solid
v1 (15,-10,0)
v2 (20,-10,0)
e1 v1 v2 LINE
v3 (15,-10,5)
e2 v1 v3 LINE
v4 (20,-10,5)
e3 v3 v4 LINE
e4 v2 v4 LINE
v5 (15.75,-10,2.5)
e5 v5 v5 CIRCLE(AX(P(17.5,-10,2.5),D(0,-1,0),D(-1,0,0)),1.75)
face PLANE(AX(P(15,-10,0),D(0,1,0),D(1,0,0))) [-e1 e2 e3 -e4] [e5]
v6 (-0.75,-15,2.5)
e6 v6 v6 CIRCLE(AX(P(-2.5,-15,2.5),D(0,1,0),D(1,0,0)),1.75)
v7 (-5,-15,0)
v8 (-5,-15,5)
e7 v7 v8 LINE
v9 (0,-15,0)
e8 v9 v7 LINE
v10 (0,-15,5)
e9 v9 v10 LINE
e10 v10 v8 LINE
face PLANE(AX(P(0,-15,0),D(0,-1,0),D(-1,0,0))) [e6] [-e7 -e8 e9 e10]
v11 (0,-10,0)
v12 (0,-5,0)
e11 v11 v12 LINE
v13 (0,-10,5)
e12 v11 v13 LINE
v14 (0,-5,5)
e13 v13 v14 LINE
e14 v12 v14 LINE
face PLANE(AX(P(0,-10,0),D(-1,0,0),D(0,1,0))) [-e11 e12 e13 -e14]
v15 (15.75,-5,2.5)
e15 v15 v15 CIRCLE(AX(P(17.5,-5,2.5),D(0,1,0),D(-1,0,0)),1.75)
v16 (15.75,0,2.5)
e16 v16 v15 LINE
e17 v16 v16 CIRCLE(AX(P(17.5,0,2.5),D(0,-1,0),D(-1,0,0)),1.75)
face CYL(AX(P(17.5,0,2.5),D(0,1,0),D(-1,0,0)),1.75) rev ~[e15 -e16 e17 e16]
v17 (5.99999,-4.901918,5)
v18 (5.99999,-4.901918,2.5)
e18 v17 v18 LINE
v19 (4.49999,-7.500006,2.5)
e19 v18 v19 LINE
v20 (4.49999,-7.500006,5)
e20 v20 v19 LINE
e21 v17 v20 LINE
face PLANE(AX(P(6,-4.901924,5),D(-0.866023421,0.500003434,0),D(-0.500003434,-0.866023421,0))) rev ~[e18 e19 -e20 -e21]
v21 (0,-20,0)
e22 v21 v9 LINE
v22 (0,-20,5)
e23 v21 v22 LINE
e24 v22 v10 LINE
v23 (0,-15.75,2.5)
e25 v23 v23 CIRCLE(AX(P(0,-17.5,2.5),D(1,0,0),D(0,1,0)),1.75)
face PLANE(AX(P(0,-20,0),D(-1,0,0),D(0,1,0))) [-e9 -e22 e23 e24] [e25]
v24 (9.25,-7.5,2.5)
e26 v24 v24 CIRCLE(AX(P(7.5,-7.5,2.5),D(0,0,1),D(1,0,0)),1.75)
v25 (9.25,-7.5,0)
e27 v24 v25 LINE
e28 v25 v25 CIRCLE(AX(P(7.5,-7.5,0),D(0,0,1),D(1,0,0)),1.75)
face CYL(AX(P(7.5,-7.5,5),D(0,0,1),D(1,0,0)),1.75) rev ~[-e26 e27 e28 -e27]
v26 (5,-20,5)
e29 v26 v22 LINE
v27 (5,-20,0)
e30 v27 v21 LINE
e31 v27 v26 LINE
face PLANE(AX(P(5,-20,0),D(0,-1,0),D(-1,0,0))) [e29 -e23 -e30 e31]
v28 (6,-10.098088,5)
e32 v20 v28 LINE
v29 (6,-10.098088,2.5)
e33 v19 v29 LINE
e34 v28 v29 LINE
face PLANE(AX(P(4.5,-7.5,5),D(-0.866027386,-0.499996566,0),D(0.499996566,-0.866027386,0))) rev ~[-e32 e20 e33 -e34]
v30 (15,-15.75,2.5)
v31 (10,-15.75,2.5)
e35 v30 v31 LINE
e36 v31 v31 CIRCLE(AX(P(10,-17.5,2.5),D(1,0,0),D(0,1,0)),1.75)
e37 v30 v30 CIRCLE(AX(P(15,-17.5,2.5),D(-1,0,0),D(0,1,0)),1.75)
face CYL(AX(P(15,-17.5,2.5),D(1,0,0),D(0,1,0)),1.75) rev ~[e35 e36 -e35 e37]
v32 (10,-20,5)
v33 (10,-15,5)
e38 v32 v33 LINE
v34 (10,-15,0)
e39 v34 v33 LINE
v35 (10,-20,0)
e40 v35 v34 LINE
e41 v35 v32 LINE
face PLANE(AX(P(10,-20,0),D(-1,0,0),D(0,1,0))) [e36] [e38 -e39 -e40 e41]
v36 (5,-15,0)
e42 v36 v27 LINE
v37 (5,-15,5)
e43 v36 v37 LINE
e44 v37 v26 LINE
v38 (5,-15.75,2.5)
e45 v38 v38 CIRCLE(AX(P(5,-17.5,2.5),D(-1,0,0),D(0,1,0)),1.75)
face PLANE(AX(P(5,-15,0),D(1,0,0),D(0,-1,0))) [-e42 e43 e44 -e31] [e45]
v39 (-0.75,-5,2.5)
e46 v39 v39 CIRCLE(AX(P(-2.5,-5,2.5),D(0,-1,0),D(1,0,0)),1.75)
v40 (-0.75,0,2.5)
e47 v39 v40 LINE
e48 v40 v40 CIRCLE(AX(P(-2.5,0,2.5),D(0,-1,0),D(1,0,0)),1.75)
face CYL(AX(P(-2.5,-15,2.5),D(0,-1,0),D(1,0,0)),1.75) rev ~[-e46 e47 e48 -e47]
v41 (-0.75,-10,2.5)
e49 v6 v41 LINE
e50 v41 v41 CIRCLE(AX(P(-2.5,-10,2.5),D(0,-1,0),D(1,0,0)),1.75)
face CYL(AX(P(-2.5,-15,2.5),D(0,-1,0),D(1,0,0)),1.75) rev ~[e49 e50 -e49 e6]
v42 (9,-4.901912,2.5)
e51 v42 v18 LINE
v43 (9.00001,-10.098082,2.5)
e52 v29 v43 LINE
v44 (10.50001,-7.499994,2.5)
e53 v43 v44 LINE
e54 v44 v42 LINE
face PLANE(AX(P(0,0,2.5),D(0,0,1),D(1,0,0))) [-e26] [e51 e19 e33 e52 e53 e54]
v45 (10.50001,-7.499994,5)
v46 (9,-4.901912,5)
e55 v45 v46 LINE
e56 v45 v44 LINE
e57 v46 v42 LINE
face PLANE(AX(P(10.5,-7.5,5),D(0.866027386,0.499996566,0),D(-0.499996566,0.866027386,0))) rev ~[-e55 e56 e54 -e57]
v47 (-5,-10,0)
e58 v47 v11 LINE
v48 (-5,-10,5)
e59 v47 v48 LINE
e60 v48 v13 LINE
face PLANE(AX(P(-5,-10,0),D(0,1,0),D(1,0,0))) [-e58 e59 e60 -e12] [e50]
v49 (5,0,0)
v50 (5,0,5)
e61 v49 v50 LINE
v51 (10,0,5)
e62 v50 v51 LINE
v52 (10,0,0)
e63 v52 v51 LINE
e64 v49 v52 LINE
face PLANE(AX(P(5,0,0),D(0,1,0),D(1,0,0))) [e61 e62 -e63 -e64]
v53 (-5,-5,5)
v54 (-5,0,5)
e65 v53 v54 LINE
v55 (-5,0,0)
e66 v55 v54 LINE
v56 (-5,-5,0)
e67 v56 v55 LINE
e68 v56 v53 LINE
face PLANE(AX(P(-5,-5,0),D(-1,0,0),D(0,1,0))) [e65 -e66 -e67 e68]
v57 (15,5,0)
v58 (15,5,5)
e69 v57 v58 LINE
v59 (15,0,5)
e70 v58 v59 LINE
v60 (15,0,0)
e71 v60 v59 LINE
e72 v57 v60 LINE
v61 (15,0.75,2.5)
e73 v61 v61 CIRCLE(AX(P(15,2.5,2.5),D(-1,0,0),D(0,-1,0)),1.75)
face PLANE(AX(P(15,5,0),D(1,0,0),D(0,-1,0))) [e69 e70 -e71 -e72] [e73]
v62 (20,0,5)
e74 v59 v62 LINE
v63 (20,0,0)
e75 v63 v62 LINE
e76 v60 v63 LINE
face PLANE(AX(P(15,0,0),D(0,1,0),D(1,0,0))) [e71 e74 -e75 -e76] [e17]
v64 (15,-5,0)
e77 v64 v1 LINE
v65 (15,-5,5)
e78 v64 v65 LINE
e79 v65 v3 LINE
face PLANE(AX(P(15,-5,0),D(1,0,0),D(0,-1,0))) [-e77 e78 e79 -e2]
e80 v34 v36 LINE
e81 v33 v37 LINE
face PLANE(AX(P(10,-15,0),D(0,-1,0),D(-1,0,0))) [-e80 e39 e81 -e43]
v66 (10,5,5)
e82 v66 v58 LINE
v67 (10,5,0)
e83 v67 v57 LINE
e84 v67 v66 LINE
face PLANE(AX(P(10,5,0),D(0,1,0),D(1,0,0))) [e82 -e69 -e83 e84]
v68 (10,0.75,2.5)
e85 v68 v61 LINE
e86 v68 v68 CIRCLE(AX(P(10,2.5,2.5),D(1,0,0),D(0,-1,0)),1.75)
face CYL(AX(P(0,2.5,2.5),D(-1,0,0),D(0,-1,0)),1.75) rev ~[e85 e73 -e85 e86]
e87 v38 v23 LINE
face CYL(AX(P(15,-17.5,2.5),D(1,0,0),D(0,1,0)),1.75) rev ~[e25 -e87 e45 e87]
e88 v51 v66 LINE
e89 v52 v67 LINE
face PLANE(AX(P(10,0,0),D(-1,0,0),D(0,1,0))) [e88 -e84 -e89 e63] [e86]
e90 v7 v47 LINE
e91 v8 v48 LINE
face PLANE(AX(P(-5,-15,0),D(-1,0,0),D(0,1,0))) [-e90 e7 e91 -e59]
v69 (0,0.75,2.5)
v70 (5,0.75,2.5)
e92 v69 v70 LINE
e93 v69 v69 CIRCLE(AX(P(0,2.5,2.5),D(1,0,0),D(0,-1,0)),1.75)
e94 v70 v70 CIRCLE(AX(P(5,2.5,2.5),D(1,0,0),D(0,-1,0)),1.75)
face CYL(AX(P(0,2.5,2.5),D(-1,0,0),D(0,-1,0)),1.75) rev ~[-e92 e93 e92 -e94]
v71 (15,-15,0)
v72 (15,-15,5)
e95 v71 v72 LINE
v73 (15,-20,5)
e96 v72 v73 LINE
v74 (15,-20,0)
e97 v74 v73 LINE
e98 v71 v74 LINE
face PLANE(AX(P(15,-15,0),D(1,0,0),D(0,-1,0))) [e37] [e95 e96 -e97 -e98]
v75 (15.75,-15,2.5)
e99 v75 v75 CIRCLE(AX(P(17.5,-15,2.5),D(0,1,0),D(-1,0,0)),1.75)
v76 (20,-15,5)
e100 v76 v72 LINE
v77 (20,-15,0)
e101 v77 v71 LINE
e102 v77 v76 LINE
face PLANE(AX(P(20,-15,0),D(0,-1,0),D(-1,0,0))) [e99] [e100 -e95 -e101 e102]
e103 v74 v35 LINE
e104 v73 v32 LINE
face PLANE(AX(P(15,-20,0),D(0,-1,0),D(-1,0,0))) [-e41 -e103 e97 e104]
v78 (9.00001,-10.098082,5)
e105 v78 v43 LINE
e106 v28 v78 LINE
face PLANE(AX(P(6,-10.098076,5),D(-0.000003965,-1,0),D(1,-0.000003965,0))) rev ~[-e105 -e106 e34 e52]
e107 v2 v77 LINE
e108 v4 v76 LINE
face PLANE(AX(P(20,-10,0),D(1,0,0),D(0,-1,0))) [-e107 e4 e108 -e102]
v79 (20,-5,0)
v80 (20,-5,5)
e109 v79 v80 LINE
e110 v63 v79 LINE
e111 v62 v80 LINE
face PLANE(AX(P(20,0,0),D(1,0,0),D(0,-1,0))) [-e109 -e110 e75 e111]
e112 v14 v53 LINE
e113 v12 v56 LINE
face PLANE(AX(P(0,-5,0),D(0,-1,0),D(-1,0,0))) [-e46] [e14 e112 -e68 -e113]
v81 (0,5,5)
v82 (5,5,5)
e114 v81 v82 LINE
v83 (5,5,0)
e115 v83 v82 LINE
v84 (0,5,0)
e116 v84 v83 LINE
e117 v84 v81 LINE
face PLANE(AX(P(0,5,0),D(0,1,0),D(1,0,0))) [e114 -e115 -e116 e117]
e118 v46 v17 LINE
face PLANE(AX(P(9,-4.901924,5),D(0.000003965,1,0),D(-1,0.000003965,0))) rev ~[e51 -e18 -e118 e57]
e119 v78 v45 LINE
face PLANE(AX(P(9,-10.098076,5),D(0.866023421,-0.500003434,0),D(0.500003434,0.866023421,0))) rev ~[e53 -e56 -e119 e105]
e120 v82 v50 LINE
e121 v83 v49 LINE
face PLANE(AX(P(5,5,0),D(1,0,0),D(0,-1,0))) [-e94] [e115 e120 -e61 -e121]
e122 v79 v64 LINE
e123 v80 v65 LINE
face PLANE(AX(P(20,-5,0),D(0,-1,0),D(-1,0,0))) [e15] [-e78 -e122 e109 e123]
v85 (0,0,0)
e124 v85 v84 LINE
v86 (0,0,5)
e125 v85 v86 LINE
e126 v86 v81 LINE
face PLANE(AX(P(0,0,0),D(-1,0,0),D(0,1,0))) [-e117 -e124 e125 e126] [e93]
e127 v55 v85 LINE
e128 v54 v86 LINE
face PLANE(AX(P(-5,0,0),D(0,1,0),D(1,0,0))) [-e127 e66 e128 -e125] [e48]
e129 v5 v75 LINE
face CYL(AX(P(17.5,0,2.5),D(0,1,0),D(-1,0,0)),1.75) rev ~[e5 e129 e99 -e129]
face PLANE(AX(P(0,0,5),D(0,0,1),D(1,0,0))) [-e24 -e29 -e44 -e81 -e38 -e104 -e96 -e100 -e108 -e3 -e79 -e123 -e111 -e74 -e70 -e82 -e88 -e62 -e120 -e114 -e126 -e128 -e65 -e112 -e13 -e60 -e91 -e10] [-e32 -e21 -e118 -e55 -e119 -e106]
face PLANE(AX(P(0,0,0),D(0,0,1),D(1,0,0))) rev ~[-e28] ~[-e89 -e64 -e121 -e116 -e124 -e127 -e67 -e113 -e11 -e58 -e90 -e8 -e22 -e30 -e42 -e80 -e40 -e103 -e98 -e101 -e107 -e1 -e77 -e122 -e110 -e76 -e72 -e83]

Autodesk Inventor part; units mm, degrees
ref_plane "YZ Plane" through (0, 0, 0) normal (1, 0, 0) x (0, 1, 0)
ref_plane "XZ Plane" through (0, 0, 0) normal (0, 1, 0) x (-1, 0, 0)
ref_plane "XY Plane" through (0, 0, 0) normal (0, 0, 1) x (1, 0, 0)
sketch "Sketch1" plane through (0, 0, 0) normal (0, 0, 1) x (1, 0, 0)
  line L0 (0, 0) -> (0, 5)
  line L1 (0, 5) -> (5, 5)
  line L2 (5, 5) -> (5, 0)
  line L3 (5, 0) -> (10, 0)
  line L4 (10, 0) -> (10, 5)
  line L5 (10, 5) -> (15, 5)
  line L6 (15, 5) -> (15, 0)
  line L7 (15, 0) -> (20, 0)
  line L8 (20, 0) -> (20, -5)
  line L9 (20, -5) -> (15, -5)
  line L10 (15, -5) -> (15, -10)
  line L11 (15, -10) -> (20, -10)
  line L12 (20, -10) -> (20, -15)
  line L13 (20, -15) -> (15, -15)
  line L14 (15, -15) -> (15, -20)
  line L15 (15, -20) -> (10, -20)
  line L16 (10, -20) -> (10, -15)
  line L17 (10, -15) -> (5, -15)
  line L18 (5, -15) -> (5, -20)
  line L19 (5, -20) -> (0, -20)
  line L20 (0, -20) -> (0, -15)
  line L21 (0, -15) -> (-5, -15)
  line L22 (-5, -15) -> (-5, -10)
  line L23 (-5, -10) -> (0, -10)
  line L24 (0, -10) -> (0, -5)
  line L25 (0, -5) -> (-5, -5)
  line L26 (-5, -5) -> (-5, 0)
  line L27 (-5, 0) -> (0, 0)
  dimension "d0" = 5
  dimension "d1" = 5
  dimension "d2" = 5
  dimension "d3" = 5
  dimension "d4" = 5
  dimension "d5" = 5
  dimension "d6" = 5
  dimension "d7" = 5
  dimension "d8" = 5
  dimension "d9" = 5
  dimension "d10" = 5
  dimension "d11" = 5
  dimension "d12" = 5
  dimension "d13" = 5
  dimension "d14" = 5
  dimension "d15" = 5
  dimension "d16" = 5
  dimension "d17" = 5
  dimension "d18" = 5
  dimension "d19" = 5
  dimension "d20" = 5
  dimension "d21" = 5
  dimension "d22" = 5
  dimension "d23" = 5
  dimension "d24" = 5
  dimension "d25" = 90
  dimension "d26" = 5
  dimension "d27" = 5
extrude "Extrusion1" add sketch "Sketch1" along normal blind 5
sketch "Sketch2" plane through (0, 0, 5) normal (0, 0, 1) x (1, 0, 0)
  line L0 (15, -10) -> (15, -5) projected
  line L1 (15, -7.5) -> (0, -7.5)
  line L2 (0, -10) -> (0, -5) projected
  circle A0 centre (7.5, -7.5) radius 1.75
  point P0 (0, 0)
  dimension "d30" = 3.5
extrude "Extrusion2" cut sketch "Sketch2" against normal blind 5
sketch "Sketch3" plane through (0, 0, 5) normal (0, 0, 1) x (1, 0, 0)
  circle A0 centre (7.5, -7.5) radius 1.75 projected
  line L0 (7.5, -7.5) -> (10.5, -7.5)
  line L1 (10.5, -7.5) -> (9, -4.9019)
  line L2 (7.5, -7.5) -> (9, -4.9019)
  point P0 (0, 0)
  dimension "d33" = 3
  dimension "d34" = 3
  dimension "d35" = 60
extrude "Extrusion3" cut sketch "Sketch3" against normal blind 2.5 contours L0 L2 A0 | A0 L2 L1 L0 picked at (8.3623, -6.7236)
pattern_circular "Circular Pattern1" count 6 over 360 about axis through (7.5, -7.5, 5) along (0, 0, -1) of "Extrusion3"
sketch "Sketch4" plane through (-5, -15, 0) normal (0, -1, 0) x (1, 0, 0)
  line L0 (0, 5) -> (2.5, 5)
  line L1 (0, 5) -> (5, 5) projected
  line L2 (2.5, 5) -> (2.5, 2.5)
  circle A0 centre (2.5, 2.5) radius 1.75
  point P0 (5, 0)
  dimension "d41" = 2.5
  dimension "d42" = 2.5
  dimension "d43" = 3.5
extrude "Extrusion4" cut sketch "Sketch4" against normal through all
pattern_circular "Circular Pattern2" count 4 over 360 about axis through (7.5, -7.5, 5) along (0, 0, -1) of "Extrusion4"
properties part number "crossCenterMini"
